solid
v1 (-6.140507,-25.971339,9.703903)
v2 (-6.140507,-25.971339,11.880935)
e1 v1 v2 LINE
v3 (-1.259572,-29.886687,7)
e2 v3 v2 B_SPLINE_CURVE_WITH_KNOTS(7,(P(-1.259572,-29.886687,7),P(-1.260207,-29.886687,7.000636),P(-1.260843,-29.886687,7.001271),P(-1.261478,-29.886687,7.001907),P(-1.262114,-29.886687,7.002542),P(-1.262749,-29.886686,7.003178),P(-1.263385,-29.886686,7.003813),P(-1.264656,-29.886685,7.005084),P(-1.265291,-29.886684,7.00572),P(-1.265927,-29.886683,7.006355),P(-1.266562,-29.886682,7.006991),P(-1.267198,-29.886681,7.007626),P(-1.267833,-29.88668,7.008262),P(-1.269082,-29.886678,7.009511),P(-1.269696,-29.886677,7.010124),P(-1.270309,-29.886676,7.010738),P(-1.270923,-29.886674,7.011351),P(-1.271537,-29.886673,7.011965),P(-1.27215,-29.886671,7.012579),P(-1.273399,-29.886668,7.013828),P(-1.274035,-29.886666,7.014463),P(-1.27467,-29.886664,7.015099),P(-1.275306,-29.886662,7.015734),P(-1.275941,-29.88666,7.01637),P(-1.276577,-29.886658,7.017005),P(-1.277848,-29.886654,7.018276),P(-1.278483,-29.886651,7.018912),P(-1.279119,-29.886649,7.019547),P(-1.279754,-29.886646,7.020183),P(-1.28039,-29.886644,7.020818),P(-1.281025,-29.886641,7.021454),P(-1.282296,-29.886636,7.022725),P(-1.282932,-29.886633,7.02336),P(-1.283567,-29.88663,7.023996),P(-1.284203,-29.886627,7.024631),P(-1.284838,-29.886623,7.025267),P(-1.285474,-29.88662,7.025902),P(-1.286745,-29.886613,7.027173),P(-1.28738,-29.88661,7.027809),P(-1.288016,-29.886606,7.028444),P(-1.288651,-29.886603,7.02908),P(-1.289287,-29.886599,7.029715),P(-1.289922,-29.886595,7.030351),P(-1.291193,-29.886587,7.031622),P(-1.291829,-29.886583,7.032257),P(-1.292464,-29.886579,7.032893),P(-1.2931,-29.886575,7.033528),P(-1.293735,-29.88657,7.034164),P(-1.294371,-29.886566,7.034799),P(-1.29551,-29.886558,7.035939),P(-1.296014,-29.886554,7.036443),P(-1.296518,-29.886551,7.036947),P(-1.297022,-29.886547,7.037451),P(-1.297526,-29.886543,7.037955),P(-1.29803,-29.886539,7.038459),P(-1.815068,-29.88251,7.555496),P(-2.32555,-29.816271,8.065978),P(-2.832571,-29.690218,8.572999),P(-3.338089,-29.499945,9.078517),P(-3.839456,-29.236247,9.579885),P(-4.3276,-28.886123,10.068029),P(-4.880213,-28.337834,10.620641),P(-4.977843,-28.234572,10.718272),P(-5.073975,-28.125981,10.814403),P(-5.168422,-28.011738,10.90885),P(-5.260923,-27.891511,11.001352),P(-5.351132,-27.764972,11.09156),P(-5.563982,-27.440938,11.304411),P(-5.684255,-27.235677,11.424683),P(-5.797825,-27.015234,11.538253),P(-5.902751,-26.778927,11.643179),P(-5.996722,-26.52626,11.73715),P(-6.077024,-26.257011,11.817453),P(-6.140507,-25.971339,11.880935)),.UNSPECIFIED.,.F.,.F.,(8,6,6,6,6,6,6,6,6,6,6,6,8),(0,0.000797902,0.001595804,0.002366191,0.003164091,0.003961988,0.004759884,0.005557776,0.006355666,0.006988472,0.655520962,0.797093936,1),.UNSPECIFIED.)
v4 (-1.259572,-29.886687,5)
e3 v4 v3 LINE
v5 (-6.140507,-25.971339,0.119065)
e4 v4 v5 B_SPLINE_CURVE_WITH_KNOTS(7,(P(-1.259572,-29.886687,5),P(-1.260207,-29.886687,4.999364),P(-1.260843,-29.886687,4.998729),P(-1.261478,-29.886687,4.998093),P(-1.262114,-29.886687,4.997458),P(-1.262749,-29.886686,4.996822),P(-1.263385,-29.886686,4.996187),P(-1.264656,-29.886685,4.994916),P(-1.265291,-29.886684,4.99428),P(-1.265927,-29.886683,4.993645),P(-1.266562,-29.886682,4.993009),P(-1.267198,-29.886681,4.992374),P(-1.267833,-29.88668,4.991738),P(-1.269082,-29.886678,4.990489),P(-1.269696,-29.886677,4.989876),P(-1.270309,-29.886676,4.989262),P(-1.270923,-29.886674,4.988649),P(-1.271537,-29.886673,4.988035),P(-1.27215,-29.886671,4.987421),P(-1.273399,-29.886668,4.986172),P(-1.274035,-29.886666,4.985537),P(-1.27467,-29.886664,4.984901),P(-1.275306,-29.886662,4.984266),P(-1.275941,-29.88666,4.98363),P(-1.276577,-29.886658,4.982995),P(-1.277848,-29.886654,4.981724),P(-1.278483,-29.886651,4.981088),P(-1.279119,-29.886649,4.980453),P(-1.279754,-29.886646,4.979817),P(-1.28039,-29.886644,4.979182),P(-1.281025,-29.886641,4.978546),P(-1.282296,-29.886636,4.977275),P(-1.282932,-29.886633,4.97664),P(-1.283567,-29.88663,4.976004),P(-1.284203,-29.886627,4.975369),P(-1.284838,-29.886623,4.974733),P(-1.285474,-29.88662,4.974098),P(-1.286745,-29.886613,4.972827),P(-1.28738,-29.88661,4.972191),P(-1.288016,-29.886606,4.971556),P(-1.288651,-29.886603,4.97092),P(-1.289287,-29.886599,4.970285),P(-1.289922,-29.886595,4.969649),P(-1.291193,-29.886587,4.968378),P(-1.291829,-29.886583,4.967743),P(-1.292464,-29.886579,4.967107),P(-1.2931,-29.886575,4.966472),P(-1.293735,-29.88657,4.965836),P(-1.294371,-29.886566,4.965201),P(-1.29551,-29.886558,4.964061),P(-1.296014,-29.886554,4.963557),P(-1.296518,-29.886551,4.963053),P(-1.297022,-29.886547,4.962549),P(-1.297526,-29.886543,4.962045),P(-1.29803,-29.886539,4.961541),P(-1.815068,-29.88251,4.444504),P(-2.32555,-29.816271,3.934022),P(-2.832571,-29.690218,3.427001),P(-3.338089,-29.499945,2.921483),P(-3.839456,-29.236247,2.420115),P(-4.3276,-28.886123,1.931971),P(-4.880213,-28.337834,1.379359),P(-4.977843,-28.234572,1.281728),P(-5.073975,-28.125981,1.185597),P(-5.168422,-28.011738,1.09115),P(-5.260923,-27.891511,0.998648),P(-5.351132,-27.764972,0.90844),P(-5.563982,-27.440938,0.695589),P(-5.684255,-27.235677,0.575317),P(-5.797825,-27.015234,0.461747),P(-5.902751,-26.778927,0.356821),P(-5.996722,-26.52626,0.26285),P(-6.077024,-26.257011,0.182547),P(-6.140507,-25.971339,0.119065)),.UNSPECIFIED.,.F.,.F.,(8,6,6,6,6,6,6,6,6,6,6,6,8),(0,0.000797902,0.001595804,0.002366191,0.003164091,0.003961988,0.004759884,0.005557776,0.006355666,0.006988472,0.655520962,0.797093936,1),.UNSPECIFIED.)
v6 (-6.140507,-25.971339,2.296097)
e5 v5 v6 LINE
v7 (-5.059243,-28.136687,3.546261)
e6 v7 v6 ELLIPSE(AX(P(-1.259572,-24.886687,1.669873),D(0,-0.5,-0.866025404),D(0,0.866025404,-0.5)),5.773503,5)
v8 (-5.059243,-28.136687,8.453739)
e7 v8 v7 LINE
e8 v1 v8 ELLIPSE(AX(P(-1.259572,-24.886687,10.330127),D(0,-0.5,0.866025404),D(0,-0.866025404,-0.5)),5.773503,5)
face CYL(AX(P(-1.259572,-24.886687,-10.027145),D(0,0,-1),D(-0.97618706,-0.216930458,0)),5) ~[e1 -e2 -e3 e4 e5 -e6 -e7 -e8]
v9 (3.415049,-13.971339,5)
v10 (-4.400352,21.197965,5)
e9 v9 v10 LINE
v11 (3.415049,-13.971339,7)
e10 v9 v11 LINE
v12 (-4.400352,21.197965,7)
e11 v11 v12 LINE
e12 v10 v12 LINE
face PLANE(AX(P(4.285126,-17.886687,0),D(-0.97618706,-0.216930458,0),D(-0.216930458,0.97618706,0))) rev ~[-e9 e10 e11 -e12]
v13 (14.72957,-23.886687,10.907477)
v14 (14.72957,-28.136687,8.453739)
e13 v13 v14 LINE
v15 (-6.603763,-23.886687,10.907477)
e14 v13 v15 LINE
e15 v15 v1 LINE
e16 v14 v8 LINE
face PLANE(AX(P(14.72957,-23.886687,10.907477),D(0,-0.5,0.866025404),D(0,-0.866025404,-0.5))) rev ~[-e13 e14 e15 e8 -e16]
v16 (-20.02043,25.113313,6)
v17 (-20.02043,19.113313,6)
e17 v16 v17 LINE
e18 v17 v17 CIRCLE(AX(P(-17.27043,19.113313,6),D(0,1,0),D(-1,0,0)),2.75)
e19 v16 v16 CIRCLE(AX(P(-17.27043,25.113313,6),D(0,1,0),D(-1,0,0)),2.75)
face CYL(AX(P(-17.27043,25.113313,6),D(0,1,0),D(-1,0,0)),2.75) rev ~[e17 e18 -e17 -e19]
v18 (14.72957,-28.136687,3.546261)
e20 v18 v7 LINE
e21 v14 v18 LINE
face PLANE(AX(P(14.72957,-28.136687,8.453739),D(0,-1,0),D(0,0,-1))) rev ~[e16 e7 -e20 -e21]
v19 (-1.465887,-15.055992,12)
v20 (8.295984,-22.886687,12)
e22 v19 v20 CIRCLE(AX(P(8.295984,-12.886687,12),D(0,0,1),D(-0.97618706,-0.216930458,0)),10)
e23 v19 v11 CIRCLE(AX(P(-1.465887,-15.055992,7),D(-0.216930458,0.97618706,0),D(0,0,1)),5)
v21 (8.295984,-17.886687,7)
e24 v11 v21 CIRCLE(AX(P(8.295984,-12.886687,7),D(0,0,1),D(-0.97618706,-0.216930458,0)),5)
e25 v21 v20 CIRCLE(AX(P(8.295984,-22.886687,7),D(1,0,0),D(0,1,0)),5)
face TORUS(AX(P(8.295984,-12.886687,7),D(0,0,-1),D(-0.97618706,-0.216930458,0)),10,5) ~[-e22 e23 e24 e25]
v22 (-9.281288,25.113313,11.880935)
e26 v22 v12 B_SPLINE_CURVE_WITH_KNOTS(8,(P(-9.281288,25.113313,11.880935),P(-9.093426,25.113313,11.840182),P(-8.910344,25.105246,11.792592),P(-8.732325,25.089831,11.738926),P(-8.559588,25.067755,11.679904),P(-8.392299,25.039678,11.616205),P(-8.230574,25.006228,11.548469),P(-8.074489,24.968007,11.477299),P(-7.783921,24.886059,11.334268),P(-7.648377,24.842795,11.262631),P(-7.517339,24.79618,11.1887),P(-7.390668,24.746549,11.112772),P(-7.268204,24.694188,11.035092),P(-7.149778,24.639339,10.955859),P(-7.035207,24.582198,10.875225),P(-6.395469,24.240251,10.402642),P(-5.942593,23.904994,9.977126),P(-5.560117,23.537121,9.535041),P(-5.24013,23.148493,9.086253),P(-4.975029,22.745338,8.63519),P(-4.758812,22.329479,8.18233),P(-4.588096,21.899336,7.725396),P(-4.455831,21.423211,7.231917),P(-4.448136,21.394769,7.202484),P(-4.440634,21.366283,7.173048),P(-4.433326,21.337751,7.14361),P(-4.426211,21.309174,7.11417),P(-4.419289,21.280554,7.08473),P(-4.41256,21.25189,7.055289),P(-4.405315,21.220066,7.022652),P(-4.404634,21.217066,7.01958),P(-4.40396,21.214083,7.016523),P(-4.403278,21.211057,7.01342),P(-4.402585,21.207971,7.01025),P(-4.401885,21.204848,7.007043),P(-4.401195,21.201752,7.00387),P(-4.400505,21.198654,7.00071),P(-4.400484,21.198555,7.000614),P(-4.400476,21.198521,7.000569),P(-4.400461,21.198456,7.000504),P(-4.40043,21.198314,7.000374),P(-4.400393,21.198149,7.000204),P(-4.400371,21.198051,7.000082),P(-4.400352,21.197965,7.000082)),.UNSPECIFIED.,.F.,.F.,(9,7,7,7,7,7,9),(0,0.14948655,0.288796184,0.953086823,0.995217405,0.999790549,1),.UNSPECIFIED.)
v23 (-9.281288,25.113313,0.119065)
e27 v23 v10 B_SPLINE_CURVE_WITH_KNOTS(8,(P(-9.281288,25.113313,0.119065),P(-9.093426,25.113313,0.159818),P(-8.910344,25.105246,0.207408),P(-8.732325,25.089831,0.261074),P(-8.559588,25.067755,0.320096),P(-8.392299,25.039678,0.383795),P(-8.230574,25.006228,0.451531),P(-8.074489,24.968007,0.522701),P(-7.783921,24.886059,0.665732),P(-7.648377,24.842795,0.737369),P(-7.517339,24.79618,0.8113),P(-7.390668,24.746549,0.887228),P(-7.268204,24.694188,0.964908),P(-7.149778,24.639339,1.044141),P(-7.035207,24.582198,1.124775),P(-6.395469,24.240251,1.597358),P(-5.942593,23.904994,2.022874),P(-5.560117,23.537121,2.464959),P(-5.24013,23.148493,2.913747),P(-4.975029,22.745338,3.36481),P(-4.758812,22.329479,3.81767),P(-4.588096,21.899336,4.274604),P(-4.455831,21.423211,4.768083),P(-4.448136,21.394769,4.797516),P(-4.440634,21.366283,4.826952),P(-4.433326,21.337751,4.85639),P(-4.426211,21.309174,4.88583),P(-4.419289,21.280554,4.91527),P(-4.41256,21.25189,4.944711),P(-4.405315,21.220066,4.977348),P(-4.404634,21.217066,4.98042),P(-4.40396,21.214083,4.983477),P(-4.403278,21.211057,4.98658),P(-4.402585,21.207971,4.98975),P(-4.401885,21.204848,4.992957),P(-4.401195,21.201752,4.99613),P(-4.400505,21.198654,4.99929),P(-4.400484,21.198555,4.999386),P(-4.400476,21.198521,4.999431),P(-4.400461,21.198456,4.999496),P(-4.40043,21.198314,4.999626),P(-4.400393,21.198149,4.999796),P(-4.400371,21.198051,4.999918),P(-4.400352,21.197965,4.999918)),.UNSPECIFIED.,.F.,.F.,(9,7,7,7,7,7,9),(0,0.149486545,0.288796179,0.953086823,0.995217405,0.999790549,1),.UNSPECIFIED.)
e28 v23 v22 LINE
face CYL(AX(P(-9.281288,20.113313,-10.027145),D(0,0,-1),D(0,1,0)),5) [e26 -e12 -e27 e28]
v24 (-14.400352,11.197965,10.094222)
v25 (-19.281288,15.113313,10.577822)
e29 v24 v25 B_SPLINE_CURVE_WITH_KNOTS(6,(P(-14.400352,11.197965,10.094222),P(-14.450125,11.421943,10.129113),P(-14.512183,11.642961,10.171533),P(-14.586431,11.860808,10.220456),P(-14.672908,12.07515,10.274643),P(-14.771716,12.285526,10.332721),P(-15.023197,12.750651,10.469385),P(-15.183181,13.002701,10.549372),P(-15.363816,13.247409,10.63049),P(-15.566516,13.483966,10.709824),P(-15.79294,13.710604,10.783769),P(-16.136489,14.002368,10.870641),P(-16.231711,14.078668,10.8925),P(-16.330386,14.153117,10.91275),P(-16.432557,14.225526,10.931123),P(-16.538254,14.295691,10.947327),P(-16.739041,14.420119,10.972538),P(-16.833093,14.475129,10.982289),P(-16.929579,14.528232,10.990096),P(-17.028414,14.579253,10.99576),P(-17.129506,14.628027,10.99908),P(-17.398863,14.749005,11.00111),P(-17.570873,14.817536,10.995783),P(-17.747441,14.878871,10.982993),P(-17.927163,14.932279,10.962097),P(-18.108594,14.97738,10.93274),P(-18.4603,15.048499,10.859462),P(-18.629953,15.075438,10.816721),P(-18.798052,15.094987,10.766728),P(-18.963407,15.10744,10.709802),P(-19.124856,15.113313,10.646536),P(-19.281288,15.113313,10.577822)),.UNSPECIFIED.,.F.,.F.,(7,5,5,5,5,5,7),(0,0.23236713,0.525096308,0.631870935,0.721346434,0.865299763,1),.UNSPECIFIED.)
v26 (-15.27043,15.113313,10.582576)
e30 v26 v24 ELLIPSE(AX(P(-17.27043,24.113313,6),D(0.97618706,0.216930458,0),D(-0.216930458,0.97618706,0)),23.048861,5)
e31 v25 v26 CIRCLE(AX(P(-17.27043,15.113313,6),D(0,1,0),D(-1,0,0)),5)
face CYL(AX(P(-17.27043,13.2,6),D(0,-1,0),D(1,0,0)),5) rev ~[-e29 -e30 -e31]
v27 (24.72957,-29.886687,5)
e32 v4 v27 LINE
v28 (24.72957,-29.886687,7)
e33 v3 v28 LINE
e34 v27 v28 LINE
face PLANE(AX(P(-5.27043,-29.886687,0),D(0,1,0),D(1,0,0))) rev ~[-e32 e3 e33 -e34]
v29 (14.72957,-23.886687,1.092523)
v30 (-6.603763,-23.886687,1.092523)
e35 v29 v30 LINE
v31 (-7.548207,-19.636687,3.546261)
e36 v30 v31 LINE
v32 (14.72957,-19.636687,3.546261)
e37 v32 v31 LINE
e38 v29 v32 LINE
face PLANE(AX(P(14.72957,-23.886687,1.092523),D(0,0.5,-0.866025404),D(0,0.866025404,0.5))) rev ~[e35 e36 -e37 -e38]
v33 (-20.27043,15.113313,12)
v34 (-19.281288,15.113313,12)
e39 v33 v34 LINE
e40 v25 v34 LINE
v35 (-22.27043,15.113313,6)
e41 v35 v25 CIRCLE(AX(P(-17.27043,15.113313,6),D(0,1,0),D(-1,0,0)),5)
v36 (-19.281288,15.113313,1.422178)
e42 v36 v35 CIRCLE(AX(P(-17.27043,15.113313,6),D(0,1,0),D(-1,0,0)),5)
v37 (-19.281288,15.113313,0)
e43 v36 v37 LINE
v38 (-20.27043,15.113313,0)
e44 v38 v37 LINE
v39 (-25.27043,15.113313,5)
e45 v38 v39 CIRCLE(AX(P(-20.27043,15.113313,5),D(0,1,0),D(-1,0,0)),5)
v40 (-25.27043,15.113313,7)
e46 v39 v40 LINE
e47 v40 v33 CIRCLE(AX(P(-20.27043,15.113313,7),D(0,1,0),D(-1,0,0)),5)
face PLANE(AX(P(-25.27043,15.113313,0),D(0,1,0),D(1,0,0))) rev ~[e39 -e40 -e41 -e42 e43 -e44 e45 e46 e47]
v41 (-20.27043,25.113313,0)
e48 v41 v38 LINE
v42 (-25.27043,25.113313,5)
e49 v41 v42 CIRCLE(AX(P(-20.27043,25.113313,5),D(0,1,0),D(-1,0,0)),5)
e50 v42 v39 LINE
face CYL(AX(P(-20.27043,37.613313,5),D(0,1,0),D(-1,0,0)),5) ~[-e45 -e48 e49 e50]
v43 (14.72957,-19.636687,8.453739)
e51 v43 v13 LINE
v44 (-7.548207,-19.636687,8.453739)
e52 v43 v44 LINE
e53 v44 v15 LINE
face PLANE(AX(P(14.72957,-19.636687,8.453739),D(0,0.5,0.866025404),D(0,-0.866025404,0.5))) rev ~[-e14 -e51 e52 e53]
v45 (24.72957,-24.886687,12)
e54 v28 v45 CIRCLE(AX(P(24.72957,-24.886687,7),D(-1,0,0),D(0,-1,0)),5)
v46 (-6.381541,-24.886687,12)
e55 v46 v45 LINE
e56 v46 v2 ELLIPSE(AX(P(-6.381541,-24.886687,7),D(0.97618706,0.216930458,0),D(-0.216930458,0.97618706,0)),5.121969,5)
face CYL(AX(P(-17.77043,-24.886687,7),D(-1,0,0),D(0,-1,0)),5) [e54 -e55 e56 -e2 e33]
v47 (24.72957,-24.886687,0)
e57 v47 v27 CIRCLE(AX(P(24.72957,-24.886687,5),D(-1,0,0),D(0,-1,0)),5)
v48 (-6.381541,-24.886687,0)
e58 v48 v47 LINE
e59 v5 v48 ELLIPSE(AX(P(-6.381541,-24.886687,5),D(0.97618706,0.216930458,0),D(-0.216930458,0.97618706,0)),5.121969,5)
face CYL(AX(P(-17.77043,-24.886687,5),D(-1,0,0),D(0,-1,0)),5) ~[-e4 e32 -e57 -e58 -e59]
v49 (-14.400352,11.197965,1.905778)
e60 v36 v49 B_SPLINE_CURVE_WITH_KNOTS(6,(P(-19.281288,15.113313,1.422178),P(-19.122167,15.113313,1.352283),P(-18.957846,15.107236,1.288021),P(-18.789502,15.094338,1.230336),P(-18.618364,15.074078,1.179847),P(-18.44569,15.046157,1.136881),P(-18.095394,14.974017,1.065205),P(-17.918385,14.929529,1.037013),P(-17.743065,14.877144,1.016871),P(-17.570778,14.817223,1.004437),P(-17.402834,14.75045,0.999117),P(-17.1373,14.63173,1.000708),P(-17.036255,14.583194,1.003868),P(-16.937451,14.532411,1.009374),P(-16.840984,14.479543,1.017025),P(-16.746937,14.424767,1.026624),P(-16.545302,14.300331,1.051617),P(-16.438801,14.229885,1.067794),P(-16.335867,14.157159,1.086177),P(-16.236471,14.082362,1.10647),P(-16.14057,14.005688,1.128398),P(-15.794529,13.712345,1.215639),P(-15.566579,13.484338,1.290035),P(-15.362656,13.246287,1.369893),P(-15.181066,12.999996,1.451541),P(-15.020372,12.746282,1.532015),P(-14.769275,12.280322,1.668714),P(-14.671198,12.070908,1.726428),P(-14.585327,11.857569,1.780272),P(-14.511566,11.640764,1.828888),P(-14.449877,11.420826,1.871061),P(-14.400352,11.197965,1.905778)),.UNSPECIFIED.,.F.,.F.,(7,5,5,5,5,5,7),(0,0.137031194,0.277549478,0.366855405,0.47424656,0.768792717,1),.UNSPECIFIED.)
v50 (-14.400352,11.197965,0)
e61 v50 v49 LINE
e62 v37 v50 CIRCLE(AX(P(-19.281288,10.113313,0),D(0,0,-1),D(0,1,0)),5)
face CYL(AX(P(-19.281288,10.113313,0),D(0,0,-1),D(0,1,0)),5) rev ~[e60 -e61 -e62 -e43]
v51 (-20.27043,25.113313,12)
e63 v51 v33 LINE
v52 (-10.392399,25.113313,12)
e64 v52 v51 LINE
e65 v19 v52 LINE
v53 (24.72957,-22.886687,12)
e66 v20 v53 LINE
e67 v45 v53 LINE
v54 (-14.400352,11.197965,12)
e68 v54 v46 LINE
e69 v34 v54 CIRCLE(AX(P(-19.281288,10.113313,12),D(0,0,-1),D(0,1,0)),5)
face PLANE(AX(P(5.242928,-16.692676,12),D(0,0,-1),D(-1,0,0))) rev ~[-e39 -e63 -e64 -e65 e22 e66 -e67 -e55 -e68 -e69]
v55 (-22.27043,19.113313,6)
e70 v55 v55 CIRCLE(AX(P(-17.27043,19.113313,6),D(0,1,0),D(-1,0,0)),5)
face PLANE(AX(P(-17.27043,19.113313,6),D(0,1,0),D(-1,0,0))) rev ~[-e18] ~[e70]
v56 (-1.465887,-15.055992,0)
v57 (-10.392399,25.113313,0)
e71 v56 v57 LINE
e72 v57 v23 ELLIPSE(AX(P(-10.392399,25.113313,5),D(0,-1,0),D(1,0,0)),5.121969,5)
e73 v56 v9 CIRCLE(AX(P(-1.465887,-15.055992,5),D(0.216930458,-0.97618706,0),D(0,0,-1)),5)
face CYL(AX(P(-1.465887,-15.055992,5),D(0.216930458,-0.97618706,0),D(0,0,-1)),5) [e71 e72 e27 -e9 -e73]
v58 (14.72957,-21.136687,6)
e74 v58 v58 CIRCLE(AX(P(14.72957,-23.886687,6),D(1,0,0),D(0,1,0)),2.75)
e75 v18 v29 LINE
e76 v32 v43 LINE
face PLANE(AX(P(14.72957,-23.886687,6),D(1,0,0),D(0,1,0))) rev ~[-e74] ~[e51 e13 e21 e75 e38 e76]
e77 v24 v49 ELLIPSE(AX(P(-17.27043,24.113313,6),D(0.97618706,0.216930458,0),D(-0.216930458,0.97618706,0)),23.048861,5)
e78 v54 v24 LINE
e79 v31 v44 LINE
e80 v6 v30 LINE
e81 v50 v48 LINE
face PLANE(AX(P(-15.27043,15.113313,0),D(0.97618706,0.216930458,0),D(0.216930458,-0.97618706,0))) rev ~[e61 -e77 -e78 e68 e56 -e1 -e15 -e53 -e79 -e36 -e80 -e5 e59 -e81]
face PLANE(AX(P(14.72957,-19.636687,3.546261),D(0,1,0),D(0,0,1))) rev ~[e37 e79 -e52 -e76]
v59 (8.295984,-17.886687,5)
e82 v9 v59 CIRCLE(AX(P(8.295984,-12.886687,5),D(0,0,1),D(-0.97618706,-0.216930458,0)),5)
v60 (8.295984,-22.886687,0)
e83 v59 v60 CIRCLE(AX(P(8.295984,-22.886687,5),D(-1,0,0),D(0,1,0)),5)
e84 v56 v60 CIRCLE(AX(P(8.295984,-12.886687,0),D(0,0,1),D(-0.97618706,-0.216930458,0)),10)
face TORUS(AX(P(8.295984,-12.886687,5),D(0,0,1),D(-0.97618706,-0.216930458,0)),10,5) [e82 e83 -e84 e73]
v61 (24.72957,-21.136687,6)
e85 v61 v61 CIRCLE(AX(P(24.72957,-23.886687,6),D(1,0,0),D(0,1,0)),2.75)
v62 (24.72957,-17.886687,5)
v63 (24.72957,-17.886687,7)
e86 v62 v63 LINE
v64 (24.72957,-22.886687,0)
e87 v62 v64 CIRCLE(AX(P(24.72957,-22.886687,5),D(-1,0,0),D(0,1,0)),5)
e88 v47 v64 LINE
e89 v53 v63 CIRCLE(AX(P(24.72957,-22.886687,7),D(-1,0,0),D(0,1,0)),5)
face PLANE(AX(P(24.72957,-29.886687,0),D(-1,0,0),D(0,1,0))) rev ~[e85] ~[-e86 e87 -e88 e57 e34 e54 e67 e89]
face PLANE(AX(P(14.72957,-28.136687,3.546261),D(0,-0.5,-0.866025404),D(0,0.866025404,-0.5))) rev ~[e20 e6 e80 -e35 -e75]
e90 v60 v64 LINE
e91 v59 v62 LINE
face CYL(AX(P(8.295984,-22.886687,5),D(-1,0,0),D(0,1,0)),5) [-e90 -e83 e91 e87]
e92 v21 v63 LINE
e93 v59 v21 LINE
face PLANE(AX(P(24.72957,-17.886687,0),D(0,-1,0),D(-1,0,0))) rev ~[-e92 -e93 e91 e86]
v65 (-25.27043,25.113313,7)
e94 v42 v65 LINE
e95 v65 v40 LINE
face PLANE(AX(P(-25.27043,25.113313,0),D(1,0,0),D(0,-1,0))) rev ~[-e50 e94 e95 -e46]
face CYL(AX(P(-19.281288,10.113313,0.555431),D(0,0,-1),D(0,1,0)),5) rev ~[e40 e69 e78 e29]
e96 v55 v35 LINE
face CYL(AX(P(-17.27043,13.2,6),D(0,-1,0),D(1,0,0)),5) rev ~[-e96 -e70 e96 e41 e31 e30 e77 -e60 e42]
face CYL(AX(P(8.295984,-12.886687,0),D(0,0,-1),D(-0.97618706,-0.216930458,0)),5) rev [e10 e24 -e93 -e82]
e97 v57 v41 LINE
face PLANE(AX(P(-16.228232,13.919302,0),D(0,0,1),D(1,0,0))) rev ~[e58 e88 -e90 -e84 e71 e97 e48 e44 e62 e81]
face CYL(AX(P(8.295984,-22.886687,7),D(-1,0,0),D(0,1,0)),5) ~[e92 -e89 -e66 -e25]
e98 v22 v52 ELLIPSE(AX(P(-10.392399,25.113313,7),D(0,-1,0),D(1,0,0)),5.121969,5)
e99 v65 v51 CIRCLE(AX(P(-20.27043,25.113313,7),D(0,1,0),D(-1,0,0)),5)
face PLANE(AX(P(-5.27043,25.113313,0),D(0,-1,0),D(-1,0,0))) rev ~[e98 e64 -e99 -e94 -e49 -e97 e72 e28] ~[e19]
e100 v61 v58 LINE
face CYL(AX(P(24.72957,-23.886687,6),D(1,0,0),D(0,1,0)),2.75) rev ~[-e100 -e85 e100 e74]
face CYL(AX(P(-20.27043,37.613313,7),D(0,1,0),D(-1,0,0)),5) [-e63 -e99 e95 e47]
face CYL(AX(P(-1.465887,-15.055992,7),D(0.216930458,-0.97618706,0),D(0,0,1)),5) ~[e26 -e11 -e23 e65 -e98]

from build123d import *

# Parameters (mm, degrees)
F1_DEPTH     = 12
F3_START     = -10
F2_R         = 2.75
F3_DEPTH     = 40.001
F4_DEPTH     = 50.001
F5_R         = 2.75
F6_DEPTH     = 55.001
F7_START     = -6
F5_R_2       = 5
F7_DEPTH     = 49.001
F8_T1_DEPTH  = 12
F8_T6_DEPTH  = 11.4445693846
F8_S7_R      = 5
F8_T8_DEPTH  = 8
F8_T12_DEPTH = 11.4445693846
F8_S13_R     = 5
F8_T14_DEPTH = 8
F8_T15_DEPTH = 55
F8_T17_DEPTH = 35
F8_T19_DEPTH = 28.9335864126
F8_T21_DEPTH = 32.0542901591
F8_T23_DEPTH = 52.5380765975
F8_T26_ANGLE = 77.4711922908
F8_T28_ANGLE = 77.4711922908


# Not quite as in the source:
# - a fillet or chamfer that OpenCascade refuses, or shapes differently, is made with other operations: its cross-section is extruded or revolved along the edge and cut away or added


with BuildPart() as f1:
    # F0 (on Top) → F1 (new body)
    with BuildSketch(Plane.XY):
        Polygon((-5.2704296331, 25.1133128916), (-25.2704296331, 25.1133128916), (-25.2704296331, 15.1133128916), (-15.2704296331, 15.1133128916), (-5.2704296331, -29.8866871084), (24.7295703669, -29.8866871084), (24.7295703669, -17.8866871084), (4.2851259224, -17.8866871084), align=None)
    extrude(amount=F1_DEPTH)

    # F2 (on face) → F3 (cut)
    with BuildSketch(Plane.YZ.offset(24.7295703669).offset(F3_START)):
        Polygon((-19.6366871084, 3.5462613559), (-19.6366871084, 8.4537386441), (-23.8866871084, 10.9074772881), (-28.1366871084, 8.4537386441), (-28.1366871084, 3.5462613559), (-23.8866871084, 1.0925227119), align=None)
        with Locations((-23.8866871084, 6)):
            Circle(F2_R, mode=Mode.SUBTRACT)
    extrude(amount=-F3_DEPTH, mode=Mode.SUBTRACT)

    # F2 (on face) → F4 (cut, through all)
    with BuildSketch(Plane.YZ.offset(24.7295703669)):
        with Locations((-23.8866871084, 6)):
            Circle(F2_R)
    extrude(amount=-F4_DEPTH, mode=Mode.SUBTRACT)

    # F5 (on face) → F6 (cut, through all)
    with BuildSketch(Plane(origin=(0, 25.1133128916, 0), x_dir=(-1, 0, 0), z_dir=(0, 1, 0))):
        with Locations((17.2704296331, 6)):
            Circle(F5_R)
    extrude(amount=-F6_DEPTH, mode=Mode.SUBTRACT)

    # F5 (on face) → F7 (cut)
    with BuildSketch(Plane(origin=(0, 25.1133128916, 0), x_dir=(-1, 0, 0), z_dir=(0, 1, 0)).offset(F7_START)):
        with Locations((17.2704296331, 6)):
            Circle(F5_R_2)
        with Locations((17.2704296331, 6)):
            Circle(F5_R, mode=Mode.SUBTRACT)
    extrude(amount=-F7_DEPTH, mode=Mode.SUBTRACT)

    # F8: fillet of radius 5 on 13 edges, made by hand

    # F8_s2 → F8_t1 (join)
    with BuildSketch(Plane.XY):
        with BuildLine():
            ThreePointArc((3.4150486533, -13.9713393975), (5.1673469863, -16.7868961698), (8.2959839543, -17.8866871084))
            Line((8.2959839543, -17.8866871084), (4.2851259224, -17.8866871084))
            Line((4.2851259224, -17.8866871084), (3.4150486533, -13.9713393975))
        make_face()
    extrude(amount=F8_T1_DEPTH)


with BuildPart() as f8_tool4:
    # F8_s5 → F8_t6 (new body)
    with BuildSketch(Plane.XY):
        with BuildLine():
            ThreePointArc((-19.281287665, 15.1133128916), (-16.152650697, 14.013521953), (-14.400352364, 11.1979651807))
            Line((-14.400352364, 11.1979651807), (-15.2704296331, 15.1133128916))
            Line((-15.2704296331, 15.1133128916), (-19.281287665, 15.1133128916))
        make_face()
    extrude(amount=F8_T6_DEPTH)

    # F8_s7 → F8_t8 (cut, symmetric)
    with BuildSketch(Plane.XZ.offset(-13.2)):
        with Locations((-17.2704296331, 6)):
            Circle(F8_S7_R)
    extrude(amount=F8_T8_DEPTH, both=True, mode=Mode.SUBTRACT)


with BuildPart() as f1_1:
    add(f1.part)

    # F8_t3: union F8_tool4
    add(f8_tool4.part)


with BuildPart() as f8_tool10:
    # F8_s11 → F8_t12 (new body)
    with BuildSketch(Plane.XY.offset(0.5554306154)):
        with BuildLine():
            ThreePointArc((-19.281287665, 15.1133128916), (-16.152650697, 14.013521953), (-14.400352364, 11.1979651807))
            Line((-14.400352364, 11.1979651807), (-15.2704296331, 15.1133128916))
            Line((-15.2704296331, 15.1133128916), (-19.281287665, 15.1133128916))
        make_face()
    extrude(amount=F8_T12_DEPTH)

    # F8_s13 → F8_t14 (cut, symmetric)
    with BuildSketch(Plane.XZ.offset(-13.2)):
        with Locations((-17.2704296331, 6)):
            Circle(F8_S13_R)
    extrude(amount=F8_T14_DEPTH, both=True, mode=Mode.SUBTRACT)


with BuildPart() as f1_2:
    add(f1_1.part)

    # F8_t9: union F8_tool10
    add(f8_tool10.part)

    # F8_s16 → F8_t15 (cut)
    with BuildSketch(Plane.YZ.offset(-17.7704296331)):
        with BuildLine():
            ThreePointArc((-29.8866871084, 7), (-28.4222210144, 10.5355339059), (-24.8866871084, 12))
            Line((-24.8866871084, 12), (-29.8866871084, 12))
            Line((-29.8866871084, 12), (-29.8866871084, 7))
        make_face()
        with BuildLine():
            ThreePointArc((-29.8866871084, 5), (-28.4222210144, 1.4644660941), (-24.8866871084, 0))
            Line((-24.8866871084, 0), (-29.8866871084, 0))
            Line((-29.8866871084, 0), (-29.8866871084, 5))
        make_face()
    extrude(amount=F8_T15_DEPTH, mode=Mode.SUBTRACT)

    # F8_s18 → F8_t17 (cut)
    with BuildSketch(Plane.XZ.offset(-37.6133128916)):
        with BuildLine():
            ThreePointArc((-25.2704296331, 7), (-23.8059635391, 10.5355339059), (-20.2704296331, 12))
            Line((-20.2704296331, 12), (-25.2704296331, 12))
            Line((-25.2704296331, 12), (-25.2704296331, 7))
        make_face()
        with BuildLine():
            ThreePointArc((-25.2704296331, 5), (-23.8059635391, 1.4644660941), (-20.2704296331, 0))
            Line((-20.2704296331, 0), (-25.2704296331, 0))
            Line((-25.2704296331, 0), (-25.2704296331, 5))
        make_face()
    extrude(amount=F8_T17_DEPTH, mode=Mode.SUBTRACT)

    # F8_s20 → F8_t19 (cut)
    with BuildSketch(Plane.YZ.offset(8.2959839543)):
        with BuildLine():
            ThreePointArc((-17.8866871084, 7), (-19.3511532025, 10.5355339059), (-22.8866871084, 12))
            Line((-22.8866871084, 12), (-17.8866871084, 12))
            Line((-17.8866871084, 12), (-17.8866871084, 7))
        make_face()
        with BuildLine():
            ThreePointArc((-17.8866871084, 5), (-19.3511532025, 1.4644660941), (-22.8866871084, 0))
            Line((-22.8866871084, 0), (-17.8866871084, 0))
            Line((-17.8866871084, 0), (-17.8866871084, 5))
        make_face()
    extrude(amount=F8_T19_DEPTH, mode=Mode.SUBTRACT)

    # F8_s22 → F8_t21 (cut)
    with BuildSketch(Plane.XY.offset(-10.0271450796)):
        with BuildLine():
            ThreePointArc((-6.1405069022, -25.9713393975), (-4.3882085693, -28.7868961698), (-1.2595716013, -29.8866871084))
            Line((-1.2595716013, -29.8866871084), (-5.2704296331, -29.8866871084))
            Line((-5.2704296331, -29.8866871084), (-6.1405069022, -25.9713393975))
        make_face()
        with BuildLine():
            ThreePointArc((-9.281287665, 25.1133128916), (-6.152650697, 24.013521953), (-4.400352364, 21.1979651807))
            Line((-4.400352364, 21.1979651807), (-5.2704296331, 25.1133128916))
            Line((-5.2704296331, 25.1133128916), (-9.281287665, 25.1133128916))
        make_face()
    extrude(amount=F8_T21_DEPTH, mode=Mode.SUBTRACT)

    # F8_s24 → F8_t23 (cut)
    with BuildSketch(Plane(origin=(3.1193447502, -14.037051376, 0), x_dir=(0, 0, 1), z_dir=(-0.2169304578, 0.9761870602, 0))):
        with BuildLine():
            ThreePointArc((0, -4.6970827466), (1.4644660941, -1.1615488406), (5, 0.3029172534))
            Line((5, 0.3029172534), (0, 0.3029172534))
            Line((0, 0.3029172534), (0, -4.6970827466))
        make_face()
        with BuildLine():
            ThreePointArc((12, -4.6970827466), (10.5355339059, -1.1615488406), (7, 0.3029172534))
            Line((7, 0.3029172534), (12, 0.3029172534))
            Line((12, 0.3029172534), (12, -4.6970827466))
        make_face()
    extrude(amount=F8_T23_DEPTH, mode=Mode.SUBTRACT)

    # F8_s25 → F8_t26 (revolve, cut)
    with BuildSketch(Plane(origin=(3.1193447502, -14.037051376, 0), x_dir=(0, 0, 1), z_dir=(-0.2169304578, 0.9761870602, 0))):
        with BuildLine():
            ThreePointArc((7, 0.3029172534), (10.5355339059, -1.1615488406), (12, -4.6970827466))
            Line((12, -4.6970827466), (12, 0.3029172534))
            Line((12, 0.3029172534), (7, 0.3029172534))
        make_face()
    revolve(axis=Axis((8.2959839543, -12.8866871084, 12), (0, 0, 1)), revolution_arc=F8_T26_ANGLE, mode=Mode.SUBTRACT)

    # F8_s27 → F8_t28 (revolve, cut)
    with BuildSketch(Plane(origin=(3.1193447502, -14.037051376, 0), x_dir=(0, 0, 1), z_dir=(-0.2169304578, 0.9761870602, 0))):
        with BuildLine():
            ThreePointArc((5, 0.3029172534), (1.4644660941, -1.1615488406), (0, -4.6970827466))
            Line((0, -4.6970827466), (0, 0.3029172534))
            Line((0, 0.3029172534), (5, 0.3029172534))
        make_face()
    revolve(axis=Axis((8.2959839543, -12.8866871084, 0), (0, 0, 1)), revolution_arc=F8_T28_ANGLE, mode=Mode.SUBTRACT)


solid = f1_2.part
